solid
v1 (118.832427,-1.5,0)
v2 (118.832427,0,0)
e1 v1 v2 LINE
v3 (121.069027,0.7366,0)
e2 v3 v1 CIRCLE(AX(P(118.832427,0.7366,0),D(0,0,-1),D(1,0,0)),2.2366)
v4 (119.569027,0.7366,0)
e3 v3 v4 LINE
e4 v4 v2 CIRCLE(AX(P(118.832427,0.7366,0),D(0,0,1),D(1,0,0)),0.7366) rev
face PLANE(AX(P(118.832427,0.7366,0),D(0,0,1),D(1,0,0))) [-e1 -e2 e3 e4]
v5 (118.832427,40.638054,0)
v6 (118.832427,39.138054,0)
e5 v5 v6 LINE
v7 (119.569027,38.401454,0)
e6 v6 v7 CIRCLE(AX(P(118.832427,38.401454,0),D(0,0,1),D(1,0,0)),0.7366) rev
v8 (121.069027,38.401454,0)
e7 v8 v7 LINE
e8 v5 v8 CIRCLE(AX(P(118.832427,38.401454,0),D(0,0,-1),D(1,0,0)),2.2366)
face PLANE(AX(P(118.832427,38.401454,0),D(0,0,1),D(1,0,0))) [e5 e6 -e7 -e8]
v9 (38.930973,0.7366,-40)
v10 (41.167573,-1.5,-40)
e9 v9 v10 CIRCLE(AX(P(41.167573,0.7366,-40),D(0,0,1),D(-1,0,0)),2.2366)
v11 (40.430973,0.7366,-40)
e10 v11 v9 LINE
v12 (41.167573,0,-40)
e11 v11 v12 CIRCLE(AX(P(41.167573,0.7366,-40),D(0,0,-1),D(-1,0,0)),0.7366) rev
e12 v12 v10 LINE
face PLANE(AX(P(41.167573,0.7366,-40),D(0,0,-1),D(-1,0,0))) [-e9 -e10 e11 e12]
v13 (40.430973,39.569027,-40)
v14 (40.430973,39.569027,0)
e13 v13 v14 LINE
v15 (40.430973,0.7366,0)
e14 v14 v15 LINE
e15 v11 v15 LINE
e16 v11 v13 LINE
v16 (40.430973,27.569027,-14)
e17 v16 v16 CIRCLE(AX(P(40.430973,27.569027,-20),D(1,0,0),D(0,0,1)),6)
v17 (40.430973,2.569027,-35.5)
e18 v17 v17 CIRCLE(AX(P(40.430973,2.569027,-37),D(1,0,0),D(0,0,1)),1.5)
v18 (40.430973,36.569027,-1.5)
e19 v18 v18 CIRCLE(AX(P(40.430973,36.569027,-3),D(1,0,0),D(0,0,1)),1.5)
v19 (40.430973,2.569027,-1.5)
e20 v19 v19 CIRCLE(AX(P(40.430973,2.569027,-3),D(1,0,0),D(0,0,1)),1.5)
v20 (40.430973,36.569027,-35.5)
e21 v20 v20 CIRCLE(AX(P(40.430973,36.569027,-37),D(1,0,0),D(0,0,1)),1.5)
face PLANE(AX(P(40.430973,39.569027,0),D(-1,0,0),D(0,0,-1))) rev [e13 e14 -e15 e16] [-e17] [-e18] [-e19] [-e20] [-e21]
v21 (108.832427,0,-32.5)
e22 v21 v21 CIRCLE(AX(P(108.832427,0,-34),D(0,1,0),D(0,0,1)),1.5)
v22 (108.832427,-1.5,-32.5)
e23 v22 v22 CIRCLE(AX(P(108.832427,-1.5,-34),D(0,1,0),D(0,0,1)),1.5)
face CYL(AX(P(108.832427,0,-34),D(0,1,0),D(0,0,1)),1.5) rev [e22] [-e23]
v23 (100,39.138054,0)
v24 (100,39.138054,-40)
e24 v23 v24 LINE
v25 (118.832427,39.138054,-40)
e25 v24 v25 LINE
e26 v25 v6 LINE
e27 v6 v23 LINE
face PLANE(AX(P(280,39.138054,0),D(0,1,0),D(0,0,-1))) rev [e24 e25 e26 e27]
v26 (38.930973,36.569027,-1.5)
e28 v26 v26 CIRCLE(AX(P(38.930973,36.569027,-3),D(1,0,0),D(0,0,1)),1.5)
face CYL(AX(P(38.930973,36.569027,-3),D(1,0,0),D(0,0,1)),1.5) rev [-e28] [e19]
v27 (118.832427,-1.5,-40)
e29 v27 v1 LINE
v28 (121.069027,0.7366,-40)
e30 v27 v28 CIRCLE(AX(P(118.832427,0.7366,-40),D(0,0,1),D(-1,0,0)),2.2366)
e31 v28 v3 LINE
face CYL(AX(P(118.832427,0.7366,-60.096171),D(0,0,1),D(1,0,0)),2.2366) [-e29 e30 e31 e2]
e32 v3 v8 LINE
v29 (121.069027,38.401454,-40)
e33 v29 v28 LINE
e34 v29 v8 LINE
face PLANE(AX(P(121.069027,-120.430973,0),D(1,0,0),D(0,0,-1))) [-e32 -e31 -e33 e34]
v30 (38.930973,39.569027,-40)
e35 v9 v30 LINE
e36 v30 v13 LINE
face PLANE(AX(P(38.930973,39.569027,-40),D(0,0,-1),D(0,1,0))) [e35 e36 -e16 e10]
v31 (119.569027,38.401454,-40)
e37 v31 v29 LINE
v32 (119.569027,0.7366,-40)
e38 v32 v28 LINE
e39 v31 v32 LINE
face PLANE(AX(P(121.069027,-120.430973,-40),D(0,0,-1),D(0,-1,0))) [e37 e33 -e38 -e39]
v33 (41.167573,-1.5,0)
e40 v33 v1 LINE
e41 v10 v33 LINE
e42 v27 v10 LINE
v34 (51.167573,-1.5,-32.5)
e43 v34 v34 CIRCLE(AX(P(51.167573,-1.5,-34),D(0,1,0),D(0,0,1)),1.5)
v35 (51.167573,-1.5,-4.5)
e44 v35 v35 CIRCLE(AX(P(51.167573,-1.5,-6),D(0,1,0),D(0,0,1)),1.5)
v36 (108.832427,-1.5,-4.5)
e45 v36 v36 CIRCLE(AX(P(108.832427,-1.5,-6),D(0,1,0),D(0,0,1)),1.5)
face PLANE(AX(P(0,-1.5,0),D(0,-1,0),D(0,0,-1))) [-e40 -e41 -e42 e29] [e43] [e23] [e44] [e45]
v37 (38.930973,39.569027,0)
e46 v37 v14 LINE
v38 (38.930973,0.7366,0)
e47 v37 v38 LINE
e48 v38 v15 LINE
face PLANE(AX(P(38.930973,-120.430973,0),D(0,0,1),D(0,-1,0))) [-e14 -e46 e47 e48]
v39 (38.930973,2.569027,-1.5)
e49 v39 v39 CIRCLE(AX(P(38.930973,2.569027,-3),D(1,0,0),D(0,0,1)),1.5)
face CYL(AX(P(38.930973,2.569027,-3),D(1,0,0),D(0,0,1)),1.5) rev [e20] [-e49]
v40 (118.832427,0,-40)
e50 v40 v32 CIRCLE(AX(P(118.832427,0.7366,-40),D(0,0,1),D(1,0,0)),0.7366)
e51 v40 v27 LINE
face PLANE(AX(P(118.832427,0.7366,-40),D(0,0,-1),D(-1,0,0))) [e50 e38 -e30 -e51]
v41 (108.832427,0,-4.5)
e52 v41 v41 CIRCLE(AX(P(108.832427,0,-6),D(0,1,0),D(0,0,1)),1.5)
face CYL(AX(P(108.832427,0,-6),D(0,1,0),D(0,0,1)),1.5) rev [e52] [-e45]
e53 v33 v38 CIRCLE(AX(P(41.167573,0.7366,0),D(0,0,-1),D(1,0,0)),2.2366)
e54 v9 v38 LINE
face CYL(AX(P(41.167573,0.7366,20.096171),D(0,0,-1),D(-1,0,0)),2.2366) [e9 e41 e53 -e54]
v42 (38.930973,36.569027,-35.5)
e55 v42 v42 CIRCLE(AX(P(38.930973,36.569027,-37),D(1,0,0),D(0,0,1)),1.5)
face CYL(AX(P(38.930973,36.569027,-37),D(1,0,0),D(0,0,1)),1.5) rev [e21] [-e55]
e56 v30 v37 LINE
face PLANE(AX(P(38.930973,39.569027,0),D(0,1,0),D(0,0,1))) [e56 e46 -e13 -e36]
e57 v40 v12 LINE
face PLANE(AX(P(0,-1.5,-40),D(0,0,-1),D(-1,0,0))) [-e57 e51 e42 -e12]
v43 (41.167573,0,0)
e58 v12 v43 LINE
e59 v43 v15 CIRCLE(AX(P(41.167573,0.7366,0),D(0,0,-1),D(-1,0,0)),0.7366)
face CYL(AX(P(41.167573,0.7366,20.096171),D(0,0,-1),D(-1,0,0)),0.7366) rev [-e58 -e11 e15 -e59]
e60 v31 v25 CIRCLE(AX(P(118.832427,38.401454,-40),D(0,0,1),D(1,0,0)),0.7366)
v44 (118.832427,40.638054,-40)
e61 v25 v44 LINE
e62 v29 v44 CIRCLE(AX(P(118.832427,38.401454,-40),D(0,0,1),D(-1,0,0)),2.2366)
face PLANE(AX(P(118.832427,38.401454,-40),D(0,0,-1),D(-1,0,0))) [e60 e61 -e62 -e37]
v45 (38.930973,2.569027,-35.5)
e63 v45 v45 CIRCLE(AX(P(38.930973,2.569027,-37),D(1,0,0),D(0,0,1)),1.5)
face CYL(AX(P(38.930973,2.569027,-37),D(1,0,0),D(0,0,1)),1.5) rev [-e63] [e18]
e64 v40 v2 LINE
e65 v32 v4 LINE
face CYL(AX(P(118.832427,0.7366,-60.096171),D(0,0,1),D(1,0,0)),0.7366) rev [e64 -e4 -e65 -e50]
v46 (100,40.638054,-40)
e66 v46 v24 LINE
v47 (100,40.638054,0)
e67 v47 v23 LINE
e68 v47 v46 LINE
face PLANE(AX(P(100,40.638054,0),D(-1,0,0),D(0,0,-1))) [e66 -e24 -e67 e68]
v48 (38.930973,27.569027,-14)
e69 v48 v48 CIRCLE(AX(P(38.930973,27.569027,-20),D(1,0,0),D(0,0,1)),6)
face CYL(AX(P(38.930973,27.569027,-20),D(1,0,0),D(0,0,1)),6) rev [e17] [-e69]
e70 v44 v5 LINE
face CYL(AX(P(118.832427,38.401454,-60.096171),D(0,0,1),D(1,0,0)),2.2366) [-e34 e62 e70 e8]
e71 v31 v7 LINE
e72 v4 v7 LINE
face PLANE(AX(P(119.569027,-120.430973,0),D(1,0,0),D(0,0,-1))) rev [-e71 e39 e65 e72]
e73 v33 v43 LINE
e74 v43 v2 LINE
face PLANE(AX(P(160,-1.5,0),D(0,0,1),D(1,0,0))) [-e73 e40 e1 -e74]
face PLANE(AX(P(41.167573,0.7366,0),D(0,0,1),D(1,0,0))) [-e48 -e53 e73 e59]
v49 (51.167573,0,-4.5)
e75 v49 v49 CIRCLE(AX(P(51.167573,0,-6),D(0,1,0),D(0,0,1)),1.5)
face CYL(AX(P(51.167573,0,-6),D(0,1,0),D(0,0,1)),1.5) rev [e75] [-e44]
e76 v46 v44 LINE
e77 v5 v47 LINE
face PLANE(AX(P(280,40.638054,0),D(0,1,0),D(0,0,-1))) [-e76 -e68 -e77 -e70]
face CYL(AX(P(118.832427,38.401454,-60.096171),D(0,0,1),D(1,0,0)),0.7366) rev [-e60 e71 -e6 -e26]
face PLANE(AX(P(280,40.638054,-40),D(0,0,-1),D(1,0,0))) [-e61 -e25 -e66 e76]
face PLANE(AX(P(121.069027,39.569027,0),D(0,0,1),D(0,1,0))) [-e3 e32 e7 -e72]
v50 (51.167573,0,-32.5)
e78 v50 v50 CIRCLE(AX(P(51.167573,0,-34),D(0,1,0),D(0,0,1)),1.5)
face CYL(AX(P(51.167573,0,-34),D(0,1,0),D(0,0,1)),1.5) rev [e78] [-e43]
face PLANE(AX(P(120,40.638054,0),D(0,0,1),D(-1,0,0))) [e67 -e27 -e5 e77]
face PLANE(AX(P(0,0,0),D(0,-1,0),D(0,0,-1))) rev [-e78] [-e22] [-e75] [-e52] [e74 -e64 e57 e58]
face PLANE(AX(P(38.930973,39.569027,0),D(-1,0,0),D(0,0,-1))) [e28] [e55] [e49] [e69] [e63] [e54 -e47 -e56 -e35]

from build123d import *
from build123d.topology import SkipClean

# Parameters (mm, degrees)
SKETCH1_R                       = 6
SKETCH1_R_2                     = 1.5
BASE_FLANGE2_DEPTH              = 1.5
SKETCHED_START                  = -40
SKETCHED_BEND1_DEPTH            = 40
SKETCHED_BEND1_2_DEPTH          = 40
SKETCHED_START_2                = -35.4999999
SKETCHED_BEND1_3_DEPTH          = 9.4999998
SKETCHED_START_3                = -13.9999999
SKETCHED_BEND1_4_DEPTH          = 9.4999998
SKETCHED_BEND1_5_DEPTH          = 1.4999999
SKETCHED_START_4                = -1.4999999
SKETCHED_BEND1_6_DEPTH          = 1.4999999
SKETCHED_START_5                = 38.93097291
SKETCHED_BEND1_7_DEPTH          = 1.5
SKETCHED_START_6                = 40.43097291
SKETCHED_BEND1_8_DEPTH          = 0.618240168
SKETCHED_START_7                = -38.5000001
SKETCHED_BEND1_9_DEPTH          = 37.00000011
SKETCHED_BEND1_10_DEPTH         = 37.00000011
F_3_0MM_PRESS_DOWEL_HOLE1_D     = 3
F_3_0MM_PRESS_DOWEL_HOLE1_DEPTH = 1.5
F_3_0MM_PRESS_DOWEL_HOLE2_D     = 3
F_3_0MM_PRESS_DOWEL_HOLE2_DEPTH = 6
F_3_0MM_PRESS_DOWEL_HOLE2_TIP   = 0.901290929
F_3_0MM_PRESS_DOWEL_HOLE3_D     = 3
F_3_0MM_PRESS_DOWEL_HOLE3_DEPTH = 6
F_3_0MM_PRESS_DOWEL_HOLE3_TIP   = 0.901290929


with BuildPart() as part:
    # Base-Flange2: sheet metal written as solids
    # Sketch1 → Base-Flange2 (new body)
    with BuildSketch(Plane(origin=(0, 0, 0), x_dir=(1, 0, 0), z_dir=(0, 1, 0))):
        Polygon((0, 0), (40, 0), (120, 0), (160, 0), (180, 0), (180, 40), (160, 40), (120, 40), (40, 40), (0, 40), align=None)
        with Locations(Location((12, 20, 0), (0, 0, 270))):
            Circle(SKETCH1_R, mode=Mode.SUBTRACT)
        with Locations(Location((3, 37, 0), (0, 0, 270))):
            Circle(SKETCH1_R_2, mode=Mode.SUBTRACT)
        with Locations(Location((37, 37, 0), (0, 0, 270))):
            Circle(SKETCH1_R_2, mode=Mode.SUBTRACT)
        with Locations(Location((37, 3, 0), (0, 0, 270))):
            Circle(SKETCH1_R_2, mode=Mode.SUBTRACT)
        with Locations(Location((3, 3, 0), (0, 0, 270))):
            Circle(SKETCH1_R_2, mode=Mode.SUBTRACT)
    extrude(amount=-BASE_FLANGE2_DEPTH)

    # Sketched Bend1: read off the stored shape, not the designer's step
    # Sketched Bend1 outline → Sketched Bend1 (cut)
    with BuildSketch(Plane.XY.offset(SKETCHED_START)):
        with BuildLine():
            Line((180, 0), (120.944250946, 0))
            ThreePointArc((120.944250946, 0), (120.127591172, -1.086838938), (118.83242709, -1.5))
            Line((118.83242709, -1.5), (180, -1.5))
            Line((180, -1.5), (180, 0))
        make_face()
        with BuildLine():
            Line((0, -1.5), (41.16757291, -1.5))
            ThreePointArc((41.16757291, -1.5), (39.872408828, -1.086838938), (39.055749054, 0))
            Line((39.055749054, 0), (0, 0))
            Line((0, 0), (0, -1.5))
        make_face()
    extrude(amount=SKETCHED_BEND1_DEPTH, mode=Mode.SUBTRACT)

    # Sketched Bend1 2 outline → Sketched Bend1 2 (add)
    with BuildSketch(Plane.XY.offset(SKETCHED_START)):
        with BuildLine():
            ThreePointArc((120.944250946, 0), (121.037612433, 0.363053267), (121.06902709, 0.7366))
            Line((121.06902709, 0.7366), (121.06902709, 38.401454181))
            ThreePointArc((121.06902709, 38.401454181), (120.413942116, 39.982969207), (118.83242709, 40.638054181))
            Line((118.83242709, 40.638054181), (100, 40.638054181))
            Line((100, 40.638054181), (100, 39.138054181))
            Line((100, 39.138054181), (118.83242709, 39.138054181))
            ThreePointArc((118.83242709, 39.138054181), (119.353281945, 38.922309036), (119.56902709, 38.401454181))
            Line((119.56902709, 38.401454181), (119.56902709, 0.7366))
            ThreePointArc((119.56902709, 0.7366), (119.353281945, 0.215745145), (118.83242709, 0))
            Line((118.83242709, 0), (120.944250946, 0))
        make_face()
    extrude(amount=SKETCHED_BEND1_2_DEPTH)

    # Sketched Bend1 3 outline → Sketched Bend1 3 (add)
    with BuildSketch(Plane.XY.offset(SKETCHED_START_2)):
        with BuildLine():
            Line((39.055749054, 0), (41.16757291, 0))
            ThreePointArc((41.16757291, 0), (40.646718055, 0.215745145), (40.43097291, 0.7366))
            Line((40.43097291, 0.7366), (40.43097291, 39.56902709))
            Line((40.43097291, 39.56902709), (38.93097291, 39.56902709))
            Line((38.93097291, 39.56902709), (38.93097291, 0.7366))
            ThreePointArc((38.93097291, 0.7366), (38.962387567, 0.363053267), (39.055749054, 0))
        make_face()
    extrude(amount=SKETCHED_BEND1_3_DEPTH)

    # Sketched Bend1 4 outline → Sketched Bend1 4 (add)
    with BuildSketch(Plane.XY.offset(SKETCHED_START_3)):
        with BuildLine():
            Line((39.055749054, 0), (41.16757291, 0))
            ThreePointArc((41.16757291, 0), (40.646718055, 0.215745145), (40.43097291, 0.7366))
            Line((40.43097291, 0.7366), (40.43097291, 39.56902709))
            Line((40.43097291, 39.56902709), (38.93097291, 39.56902709))
            Line((38.93097291, 39.56902709), (38.93097291, 0.7366))
            ThreePointArc((38.93097291, 0.7366), (38.962387567, 0.363053267), (39.055749054, 0))
        make_face()
    extrude(amount=SKETCHED_BEND1_4_DEPTH)

    # Sketched Bend1 5 outline → Sketched Bend1 5 (add)
    with BuildSketch(Plane.XY.offset(SKETCHED_START)):
        with BuildLine():
            Line((39.055749054, 0), (41.16757291, 0))
            ThreePointArc((41.16757291, 0), (40.646718055, 0.215745145), (40.43097291, 0.7366))
            Line((40.43097291, 0.7366), (40.43097291, 39.56902709))
            Line((40.43097291, 39.56902709), (38.93097291, 39.56902709))
            Line((38.93097291, 39.56902709), (38.93097291, 0.7366))
            ThreePointArc((38.93097291, 0.7366), (38.962387567, 0.363053267), (39.055749054, 0))
        make_face()
    extrude(amount=SKETCHED_BEND1_5_DEPTH)

    # Sketched Bend1 6 outline → Sketched Bend1 6 (add)
    with BuildSketch(Plane.XY.offset(SKETCHED_START_4)):
        with BuildLine():
            Line((39.055749054, 0), (41.16757291, 0))
            ThreePointArc((41.16757291, 0), (40.646718055, 0.215745145), (40.43097291, 0.7366))
            Line((40.43097291, 0.7366), (40.43097291, 39.56902709))
            Line((40.43097291, 39.56902709), (38.93097291, 39.56902709))
            Line((38.93097291, 39.56902709), (38.93097291, 0.7366))
            ThreePointArc((38.93097291, 0.7366), (38.962387567, 0.363053267), (39.055749054, 0))
        make_face()
    extrude(amount=SKETCHED_BEND1_6_DEPTH)

    # Sketched Bend1 7 outline → Sketched Bend1 7 (add)
    with BuildSketch(Plane.YZ.offset(SKETCHED_START_5)):
        with BuildLine():
            Line((36.56902709, -38.5), (39.56902709, -38.5000001))
            Line((39.56902709, -38.5000001), (39.56902709, -35.4999999))
            Line((39.56902709, -35.4999999), (36.56902709, -35.5))
            ThreePointArc((36.56902709, -35.5), (38.06902709, -37), (36.56902709, -38.5))
        make_face()
        with BuildLine():
            Line((2.569027031, -38.5), (36.56902709, -38.5))
            ThreePointArc((36.56902709, -38.5), (35.06902709, -37), (36.56902709, -35.5))
            Line((36.56902709, -35.5), (2.56902709, -35.5))
            ThreePointArc((2.56902709, -35.5), (4.06902709, -37.000000029), (2.569027031, -38.5))
        make_face()
        with BuildLine():
            Line((27.56902709, -26), (39.56902709, -26.0000001))
            Line((39.56902709, -26.0000001), (39.56902709, -13.9999999))
            Line((39.56902709, -13.9999999), (27.56902709, -14))
            ThreePointArc((27.56902709, -14), (33.56902709, -20), (27.56902709, -26))
        make_face()
        with BuildLine():
            Line((0, -38.5000001), (2.569027031, -38.5))
            ThreePointArc((2.569027031, -38.5), (1.06902709, -36.999999971), (2.56902709, -35.5))
            Line((2.56902709, -35.5), (0, -35.4999999))
            Line((0, -35.4999999), (0, -38.5000001))
        make_face()
        with BuildLine():
            Line((0, -26.0000001), (27.56902709, -26))
            ThreePointArc((27.56902709, -26), (21.56902709, -20), (27.56902709, -14))
            Line((27.56902709, -14), (0, -13.9999999))
            Line((0, -13.9999999), (0, -26.0000001))
        make_face()
        with BuildLine():
            Line((36.56902709, -4.5), (39.56902709, -4.5000001))
            Line((39.56902709, -4.5000001), (39.56902709, -1.4999999))
            Line((39.56902709, -1.4999999), (36.56902709, -1.5))
            ThreePointArc((36.56902709, -1.5), (38.06902709, -3), (36.56902709, -4.5))
        make_face()
        with BuildLine():
            Line((2.56902709, -4.5), (36.56902709, -4.5))
            ThreePointArc((36.56902709, -4.5), (35.06902709, -3), (36.56902709, -1.5))
            Line((36.56902709, -1.5), (2.569027095, -1.5))
            ThreePointArc((2.569027095, -1.5), (4.06902709, -3.000000002), (2.56902709, -4.5))
        make_face()
        with BuildLine():
            Line((0, -4.5000001), (2.56902709, -4.5))
            ThreePointArc((2.56902709, -4.5), (1.06902709, -2.999999998), (2.569027095, -1.5))
            Line((2.569027095, -1.5), (0, -1.4999999))
            Line((0, -1.4999999), (0, -4.5000001))
        make_face()
    extrude(amount=SKETCHED_BEND1_7_DEPTH)

    # Sketched Bend1 8 outline → Sketched Bend1 8 (add)
    with BuildSketch(Plane.YZ.offset(SKETCHED_START_6)):
        with BuildLine():
            Line((0, -38.5000001), (2.569027031, -38.5))
            ThreePointArc((2.569027031, -38.5), (1.06902709, -36.999999971), (2.56902709, -35.5))
            Line((2.56902709, -35.5), (0, -35.4999999))
            Line((0, -35.4999999), (0, -38.5000001))
        make_face()
        with BuildLine():
            Line((0, -26.0000001), (27.56902709, -26))
            ThreePointArc((27.56902709, -26), (21.56902709, -20), (27.56902709, -14))
            Line((27.56902709, -14), (0, -13.9999999))
            Line((0, -13.9999999), (0, -26.0000001))
        make_face()
        with BuildLine():
            Line((0, -4.5000001), (2.56902709, -4.5))
            ThreePointArc((2.56902709, -4.5), (1.06902709, -2.999999998), (2.569027095, -1.5))
            Line((2.569027095, -1.5), (0, -1.4999999))
            Line((0, -1.4999999), (0, -4.5000001))
        make_face()
    extrude(amount=SKETCHED_BEND1_8_DEPTH)

    # Sketched Bend1 9 outline → Sketched Bend1 9 (cut)
    with SkipClean():  # the faces are left unmerged after this step: merging them gives an invalid solid
        with BuildSketch(Plane.XY.offset(SKETCHED_START_7)):
            with BuildLine():
                ThreePointArc((40.43097291, 0.7366), (40.606429696, 0.259423037), (41.049213078, 0.009571452))
                Line((41.049213078, 0.009571452), (41.049213078, 27.56902709))
                Line((41.049213078, 27.56902709), (40.43097291, 27.56902709))
                Line((40.43097291, 27.56902709), (40.43097291, 0.7366))
            make_face()
            with BuildLine():
                ThreePointArc((39.055749054, 0), (38.962387567, 0.363053267), (38.93097291, 0.7366))
                Line((38.93097291, 0.7366), (38.93097291, 0))
                Line((38.93097291, 0), (39.055749054, 0))
            make_face()
        extrude(amount=SKETCHED_BEND1_9_DEPTH, mode=Mode.SUBTRACT)

    # Sketched Bend1 10 outline → Sketched Bend1 10 (add)
    with SkipClean():  # the faces are left unmerged after this step: merging them gives an invalid solid
        with BuildSketch(Plane.XY.offset(SKETCHED_START_7)):
            with BuildLine():
                ThreePointArc((41.16757291, 0), (41.108199805, 0.002396762), (41.049213078, 0.009571452))
                Line((41.049213078, 0.009571452), (41.049213078, 0))
                Line((41.049213078, 0), (41.16757291, 0))
            make_face()
        extrude(amount=SKETCHED_BEND1_10_DEPTH)

    # Ø3.0mm Press Dowel Hole1
    with Locations(Plane(origin=(0, 0, 0), x_dir=(1, 0, 0), z_dir=(0, 1, 0))):
        with Locations((108.83242709, 34), (108.83242709, 6), (51.16757291, 6), (51.16757291, 34)):
            Hole(F_3_0MM_PRESS_DOWEL_HOLE1_D / 2, depth=F_3_0MM_PRESS_DOWEL_HOLE1_DEPTH)

    # Ø3.0mm Press Dowel Hole2
    with Locations(Plane(origin=(-87.600386311, -7.5, 7.525513363), x_dir=(0, 0, -1), z_dir=(0, -1, 0))):
        with Locations((220.525513363, 156.531359221), (102.525513363, 181.531359221), (102.525513363, 271.531359221), (89.19270005, 226.531359221), (210.525513363, 317.793651488), (230.525513363, 317.793651488), (252.525513363, 320.462332131), (232.525513363, 300.462332131), (252.525513363, 132.600386311), (232.525513363, 152.600386311), (111.286271896, 136.531359221), (91.286271896, 136.531359221), (41.525513363, 196.432813402), (13.525513363, 196.432813402), (41.525513363, 138.767959221), (13.525513363, 138.767959221), (41.525513363, 256.62990504), (13.525513363, 256.62990504), (41.525513363, 314.294759221), (13.525513363, 314.294759221)):
            Hole(F_3_0MM_PRESS_DOWEL_HOLE2_D / 2, depth=F_3_0MM_PRESS_DOWEL_HOLE2_DEPTH)
            with Locations((0, 0, -(F_3_0MM_PRESS_DOWEL_HOLE2_DEPTH + F_3_0MM_PRESS_DOWEL_HOLE2_TIP / 2))):  # 118° drill point
                Cone(0, F_3_0MM_PRESS_DOWEL_HOLE2_D / 2, F_3_0MM_PRESS_DOWEL_HOLE2_TIP, mode=Mode.SUBTRACT)

    # Ø3.0mm Press Dowel Hole3
    with Locations(Plane(origin=(365.462332131, -7.5, -47.525513363), x_dir=(0, 0, 1), z_dir=(0, -1, 0))):
        with Locations((220.525513363, 156.531359221), (102.525513363, 181.531359221), (102.525513363, 271.531359221), (89.19270005, 226.531359221), (210.525513363, 317.793651488), (230.525513363, 317.793651488), (252.525513363, 320.462332131), (232.525513363, 300.462332131), (252.525513363, 132.600386311), (232.525513363, 152.600386311), (111.286271896, 136.531359221), (91.286271896, 136.531359221), (41.525513363, 196.432813402), (13.525513363, 196.432813402), (41.525513363, 138.767959221), (13.525513363, 138.767959221), (41.525513363, 256.62990504), (13.525513363, 256.62990504), (41.525513363, 314.294759221), (13.525513363, 314.294759221)):
            Hole(F_3_0MM_PRESS_DOWEL_HOLE3_D / 2, depth=F_3_0MM_PRESS_DOWEL_HOLE3_DEPTH)
            with Locations((0, 0, -(F_3_0MM_PRESS_DOWEL_HOLE3_DEPTH + F_3_0MM_PRESS_DOWEL_HOLE3_TIP / 2))):  # 118° drill point
                Cone(0, F_3_0MM_PRESS_DOWEL_HOLE3_D / 2, F_3_0MM_PRESS_DOWEL_HOLE3_TIP, mode=Mode.SUBTRACT)


solid = part.part
